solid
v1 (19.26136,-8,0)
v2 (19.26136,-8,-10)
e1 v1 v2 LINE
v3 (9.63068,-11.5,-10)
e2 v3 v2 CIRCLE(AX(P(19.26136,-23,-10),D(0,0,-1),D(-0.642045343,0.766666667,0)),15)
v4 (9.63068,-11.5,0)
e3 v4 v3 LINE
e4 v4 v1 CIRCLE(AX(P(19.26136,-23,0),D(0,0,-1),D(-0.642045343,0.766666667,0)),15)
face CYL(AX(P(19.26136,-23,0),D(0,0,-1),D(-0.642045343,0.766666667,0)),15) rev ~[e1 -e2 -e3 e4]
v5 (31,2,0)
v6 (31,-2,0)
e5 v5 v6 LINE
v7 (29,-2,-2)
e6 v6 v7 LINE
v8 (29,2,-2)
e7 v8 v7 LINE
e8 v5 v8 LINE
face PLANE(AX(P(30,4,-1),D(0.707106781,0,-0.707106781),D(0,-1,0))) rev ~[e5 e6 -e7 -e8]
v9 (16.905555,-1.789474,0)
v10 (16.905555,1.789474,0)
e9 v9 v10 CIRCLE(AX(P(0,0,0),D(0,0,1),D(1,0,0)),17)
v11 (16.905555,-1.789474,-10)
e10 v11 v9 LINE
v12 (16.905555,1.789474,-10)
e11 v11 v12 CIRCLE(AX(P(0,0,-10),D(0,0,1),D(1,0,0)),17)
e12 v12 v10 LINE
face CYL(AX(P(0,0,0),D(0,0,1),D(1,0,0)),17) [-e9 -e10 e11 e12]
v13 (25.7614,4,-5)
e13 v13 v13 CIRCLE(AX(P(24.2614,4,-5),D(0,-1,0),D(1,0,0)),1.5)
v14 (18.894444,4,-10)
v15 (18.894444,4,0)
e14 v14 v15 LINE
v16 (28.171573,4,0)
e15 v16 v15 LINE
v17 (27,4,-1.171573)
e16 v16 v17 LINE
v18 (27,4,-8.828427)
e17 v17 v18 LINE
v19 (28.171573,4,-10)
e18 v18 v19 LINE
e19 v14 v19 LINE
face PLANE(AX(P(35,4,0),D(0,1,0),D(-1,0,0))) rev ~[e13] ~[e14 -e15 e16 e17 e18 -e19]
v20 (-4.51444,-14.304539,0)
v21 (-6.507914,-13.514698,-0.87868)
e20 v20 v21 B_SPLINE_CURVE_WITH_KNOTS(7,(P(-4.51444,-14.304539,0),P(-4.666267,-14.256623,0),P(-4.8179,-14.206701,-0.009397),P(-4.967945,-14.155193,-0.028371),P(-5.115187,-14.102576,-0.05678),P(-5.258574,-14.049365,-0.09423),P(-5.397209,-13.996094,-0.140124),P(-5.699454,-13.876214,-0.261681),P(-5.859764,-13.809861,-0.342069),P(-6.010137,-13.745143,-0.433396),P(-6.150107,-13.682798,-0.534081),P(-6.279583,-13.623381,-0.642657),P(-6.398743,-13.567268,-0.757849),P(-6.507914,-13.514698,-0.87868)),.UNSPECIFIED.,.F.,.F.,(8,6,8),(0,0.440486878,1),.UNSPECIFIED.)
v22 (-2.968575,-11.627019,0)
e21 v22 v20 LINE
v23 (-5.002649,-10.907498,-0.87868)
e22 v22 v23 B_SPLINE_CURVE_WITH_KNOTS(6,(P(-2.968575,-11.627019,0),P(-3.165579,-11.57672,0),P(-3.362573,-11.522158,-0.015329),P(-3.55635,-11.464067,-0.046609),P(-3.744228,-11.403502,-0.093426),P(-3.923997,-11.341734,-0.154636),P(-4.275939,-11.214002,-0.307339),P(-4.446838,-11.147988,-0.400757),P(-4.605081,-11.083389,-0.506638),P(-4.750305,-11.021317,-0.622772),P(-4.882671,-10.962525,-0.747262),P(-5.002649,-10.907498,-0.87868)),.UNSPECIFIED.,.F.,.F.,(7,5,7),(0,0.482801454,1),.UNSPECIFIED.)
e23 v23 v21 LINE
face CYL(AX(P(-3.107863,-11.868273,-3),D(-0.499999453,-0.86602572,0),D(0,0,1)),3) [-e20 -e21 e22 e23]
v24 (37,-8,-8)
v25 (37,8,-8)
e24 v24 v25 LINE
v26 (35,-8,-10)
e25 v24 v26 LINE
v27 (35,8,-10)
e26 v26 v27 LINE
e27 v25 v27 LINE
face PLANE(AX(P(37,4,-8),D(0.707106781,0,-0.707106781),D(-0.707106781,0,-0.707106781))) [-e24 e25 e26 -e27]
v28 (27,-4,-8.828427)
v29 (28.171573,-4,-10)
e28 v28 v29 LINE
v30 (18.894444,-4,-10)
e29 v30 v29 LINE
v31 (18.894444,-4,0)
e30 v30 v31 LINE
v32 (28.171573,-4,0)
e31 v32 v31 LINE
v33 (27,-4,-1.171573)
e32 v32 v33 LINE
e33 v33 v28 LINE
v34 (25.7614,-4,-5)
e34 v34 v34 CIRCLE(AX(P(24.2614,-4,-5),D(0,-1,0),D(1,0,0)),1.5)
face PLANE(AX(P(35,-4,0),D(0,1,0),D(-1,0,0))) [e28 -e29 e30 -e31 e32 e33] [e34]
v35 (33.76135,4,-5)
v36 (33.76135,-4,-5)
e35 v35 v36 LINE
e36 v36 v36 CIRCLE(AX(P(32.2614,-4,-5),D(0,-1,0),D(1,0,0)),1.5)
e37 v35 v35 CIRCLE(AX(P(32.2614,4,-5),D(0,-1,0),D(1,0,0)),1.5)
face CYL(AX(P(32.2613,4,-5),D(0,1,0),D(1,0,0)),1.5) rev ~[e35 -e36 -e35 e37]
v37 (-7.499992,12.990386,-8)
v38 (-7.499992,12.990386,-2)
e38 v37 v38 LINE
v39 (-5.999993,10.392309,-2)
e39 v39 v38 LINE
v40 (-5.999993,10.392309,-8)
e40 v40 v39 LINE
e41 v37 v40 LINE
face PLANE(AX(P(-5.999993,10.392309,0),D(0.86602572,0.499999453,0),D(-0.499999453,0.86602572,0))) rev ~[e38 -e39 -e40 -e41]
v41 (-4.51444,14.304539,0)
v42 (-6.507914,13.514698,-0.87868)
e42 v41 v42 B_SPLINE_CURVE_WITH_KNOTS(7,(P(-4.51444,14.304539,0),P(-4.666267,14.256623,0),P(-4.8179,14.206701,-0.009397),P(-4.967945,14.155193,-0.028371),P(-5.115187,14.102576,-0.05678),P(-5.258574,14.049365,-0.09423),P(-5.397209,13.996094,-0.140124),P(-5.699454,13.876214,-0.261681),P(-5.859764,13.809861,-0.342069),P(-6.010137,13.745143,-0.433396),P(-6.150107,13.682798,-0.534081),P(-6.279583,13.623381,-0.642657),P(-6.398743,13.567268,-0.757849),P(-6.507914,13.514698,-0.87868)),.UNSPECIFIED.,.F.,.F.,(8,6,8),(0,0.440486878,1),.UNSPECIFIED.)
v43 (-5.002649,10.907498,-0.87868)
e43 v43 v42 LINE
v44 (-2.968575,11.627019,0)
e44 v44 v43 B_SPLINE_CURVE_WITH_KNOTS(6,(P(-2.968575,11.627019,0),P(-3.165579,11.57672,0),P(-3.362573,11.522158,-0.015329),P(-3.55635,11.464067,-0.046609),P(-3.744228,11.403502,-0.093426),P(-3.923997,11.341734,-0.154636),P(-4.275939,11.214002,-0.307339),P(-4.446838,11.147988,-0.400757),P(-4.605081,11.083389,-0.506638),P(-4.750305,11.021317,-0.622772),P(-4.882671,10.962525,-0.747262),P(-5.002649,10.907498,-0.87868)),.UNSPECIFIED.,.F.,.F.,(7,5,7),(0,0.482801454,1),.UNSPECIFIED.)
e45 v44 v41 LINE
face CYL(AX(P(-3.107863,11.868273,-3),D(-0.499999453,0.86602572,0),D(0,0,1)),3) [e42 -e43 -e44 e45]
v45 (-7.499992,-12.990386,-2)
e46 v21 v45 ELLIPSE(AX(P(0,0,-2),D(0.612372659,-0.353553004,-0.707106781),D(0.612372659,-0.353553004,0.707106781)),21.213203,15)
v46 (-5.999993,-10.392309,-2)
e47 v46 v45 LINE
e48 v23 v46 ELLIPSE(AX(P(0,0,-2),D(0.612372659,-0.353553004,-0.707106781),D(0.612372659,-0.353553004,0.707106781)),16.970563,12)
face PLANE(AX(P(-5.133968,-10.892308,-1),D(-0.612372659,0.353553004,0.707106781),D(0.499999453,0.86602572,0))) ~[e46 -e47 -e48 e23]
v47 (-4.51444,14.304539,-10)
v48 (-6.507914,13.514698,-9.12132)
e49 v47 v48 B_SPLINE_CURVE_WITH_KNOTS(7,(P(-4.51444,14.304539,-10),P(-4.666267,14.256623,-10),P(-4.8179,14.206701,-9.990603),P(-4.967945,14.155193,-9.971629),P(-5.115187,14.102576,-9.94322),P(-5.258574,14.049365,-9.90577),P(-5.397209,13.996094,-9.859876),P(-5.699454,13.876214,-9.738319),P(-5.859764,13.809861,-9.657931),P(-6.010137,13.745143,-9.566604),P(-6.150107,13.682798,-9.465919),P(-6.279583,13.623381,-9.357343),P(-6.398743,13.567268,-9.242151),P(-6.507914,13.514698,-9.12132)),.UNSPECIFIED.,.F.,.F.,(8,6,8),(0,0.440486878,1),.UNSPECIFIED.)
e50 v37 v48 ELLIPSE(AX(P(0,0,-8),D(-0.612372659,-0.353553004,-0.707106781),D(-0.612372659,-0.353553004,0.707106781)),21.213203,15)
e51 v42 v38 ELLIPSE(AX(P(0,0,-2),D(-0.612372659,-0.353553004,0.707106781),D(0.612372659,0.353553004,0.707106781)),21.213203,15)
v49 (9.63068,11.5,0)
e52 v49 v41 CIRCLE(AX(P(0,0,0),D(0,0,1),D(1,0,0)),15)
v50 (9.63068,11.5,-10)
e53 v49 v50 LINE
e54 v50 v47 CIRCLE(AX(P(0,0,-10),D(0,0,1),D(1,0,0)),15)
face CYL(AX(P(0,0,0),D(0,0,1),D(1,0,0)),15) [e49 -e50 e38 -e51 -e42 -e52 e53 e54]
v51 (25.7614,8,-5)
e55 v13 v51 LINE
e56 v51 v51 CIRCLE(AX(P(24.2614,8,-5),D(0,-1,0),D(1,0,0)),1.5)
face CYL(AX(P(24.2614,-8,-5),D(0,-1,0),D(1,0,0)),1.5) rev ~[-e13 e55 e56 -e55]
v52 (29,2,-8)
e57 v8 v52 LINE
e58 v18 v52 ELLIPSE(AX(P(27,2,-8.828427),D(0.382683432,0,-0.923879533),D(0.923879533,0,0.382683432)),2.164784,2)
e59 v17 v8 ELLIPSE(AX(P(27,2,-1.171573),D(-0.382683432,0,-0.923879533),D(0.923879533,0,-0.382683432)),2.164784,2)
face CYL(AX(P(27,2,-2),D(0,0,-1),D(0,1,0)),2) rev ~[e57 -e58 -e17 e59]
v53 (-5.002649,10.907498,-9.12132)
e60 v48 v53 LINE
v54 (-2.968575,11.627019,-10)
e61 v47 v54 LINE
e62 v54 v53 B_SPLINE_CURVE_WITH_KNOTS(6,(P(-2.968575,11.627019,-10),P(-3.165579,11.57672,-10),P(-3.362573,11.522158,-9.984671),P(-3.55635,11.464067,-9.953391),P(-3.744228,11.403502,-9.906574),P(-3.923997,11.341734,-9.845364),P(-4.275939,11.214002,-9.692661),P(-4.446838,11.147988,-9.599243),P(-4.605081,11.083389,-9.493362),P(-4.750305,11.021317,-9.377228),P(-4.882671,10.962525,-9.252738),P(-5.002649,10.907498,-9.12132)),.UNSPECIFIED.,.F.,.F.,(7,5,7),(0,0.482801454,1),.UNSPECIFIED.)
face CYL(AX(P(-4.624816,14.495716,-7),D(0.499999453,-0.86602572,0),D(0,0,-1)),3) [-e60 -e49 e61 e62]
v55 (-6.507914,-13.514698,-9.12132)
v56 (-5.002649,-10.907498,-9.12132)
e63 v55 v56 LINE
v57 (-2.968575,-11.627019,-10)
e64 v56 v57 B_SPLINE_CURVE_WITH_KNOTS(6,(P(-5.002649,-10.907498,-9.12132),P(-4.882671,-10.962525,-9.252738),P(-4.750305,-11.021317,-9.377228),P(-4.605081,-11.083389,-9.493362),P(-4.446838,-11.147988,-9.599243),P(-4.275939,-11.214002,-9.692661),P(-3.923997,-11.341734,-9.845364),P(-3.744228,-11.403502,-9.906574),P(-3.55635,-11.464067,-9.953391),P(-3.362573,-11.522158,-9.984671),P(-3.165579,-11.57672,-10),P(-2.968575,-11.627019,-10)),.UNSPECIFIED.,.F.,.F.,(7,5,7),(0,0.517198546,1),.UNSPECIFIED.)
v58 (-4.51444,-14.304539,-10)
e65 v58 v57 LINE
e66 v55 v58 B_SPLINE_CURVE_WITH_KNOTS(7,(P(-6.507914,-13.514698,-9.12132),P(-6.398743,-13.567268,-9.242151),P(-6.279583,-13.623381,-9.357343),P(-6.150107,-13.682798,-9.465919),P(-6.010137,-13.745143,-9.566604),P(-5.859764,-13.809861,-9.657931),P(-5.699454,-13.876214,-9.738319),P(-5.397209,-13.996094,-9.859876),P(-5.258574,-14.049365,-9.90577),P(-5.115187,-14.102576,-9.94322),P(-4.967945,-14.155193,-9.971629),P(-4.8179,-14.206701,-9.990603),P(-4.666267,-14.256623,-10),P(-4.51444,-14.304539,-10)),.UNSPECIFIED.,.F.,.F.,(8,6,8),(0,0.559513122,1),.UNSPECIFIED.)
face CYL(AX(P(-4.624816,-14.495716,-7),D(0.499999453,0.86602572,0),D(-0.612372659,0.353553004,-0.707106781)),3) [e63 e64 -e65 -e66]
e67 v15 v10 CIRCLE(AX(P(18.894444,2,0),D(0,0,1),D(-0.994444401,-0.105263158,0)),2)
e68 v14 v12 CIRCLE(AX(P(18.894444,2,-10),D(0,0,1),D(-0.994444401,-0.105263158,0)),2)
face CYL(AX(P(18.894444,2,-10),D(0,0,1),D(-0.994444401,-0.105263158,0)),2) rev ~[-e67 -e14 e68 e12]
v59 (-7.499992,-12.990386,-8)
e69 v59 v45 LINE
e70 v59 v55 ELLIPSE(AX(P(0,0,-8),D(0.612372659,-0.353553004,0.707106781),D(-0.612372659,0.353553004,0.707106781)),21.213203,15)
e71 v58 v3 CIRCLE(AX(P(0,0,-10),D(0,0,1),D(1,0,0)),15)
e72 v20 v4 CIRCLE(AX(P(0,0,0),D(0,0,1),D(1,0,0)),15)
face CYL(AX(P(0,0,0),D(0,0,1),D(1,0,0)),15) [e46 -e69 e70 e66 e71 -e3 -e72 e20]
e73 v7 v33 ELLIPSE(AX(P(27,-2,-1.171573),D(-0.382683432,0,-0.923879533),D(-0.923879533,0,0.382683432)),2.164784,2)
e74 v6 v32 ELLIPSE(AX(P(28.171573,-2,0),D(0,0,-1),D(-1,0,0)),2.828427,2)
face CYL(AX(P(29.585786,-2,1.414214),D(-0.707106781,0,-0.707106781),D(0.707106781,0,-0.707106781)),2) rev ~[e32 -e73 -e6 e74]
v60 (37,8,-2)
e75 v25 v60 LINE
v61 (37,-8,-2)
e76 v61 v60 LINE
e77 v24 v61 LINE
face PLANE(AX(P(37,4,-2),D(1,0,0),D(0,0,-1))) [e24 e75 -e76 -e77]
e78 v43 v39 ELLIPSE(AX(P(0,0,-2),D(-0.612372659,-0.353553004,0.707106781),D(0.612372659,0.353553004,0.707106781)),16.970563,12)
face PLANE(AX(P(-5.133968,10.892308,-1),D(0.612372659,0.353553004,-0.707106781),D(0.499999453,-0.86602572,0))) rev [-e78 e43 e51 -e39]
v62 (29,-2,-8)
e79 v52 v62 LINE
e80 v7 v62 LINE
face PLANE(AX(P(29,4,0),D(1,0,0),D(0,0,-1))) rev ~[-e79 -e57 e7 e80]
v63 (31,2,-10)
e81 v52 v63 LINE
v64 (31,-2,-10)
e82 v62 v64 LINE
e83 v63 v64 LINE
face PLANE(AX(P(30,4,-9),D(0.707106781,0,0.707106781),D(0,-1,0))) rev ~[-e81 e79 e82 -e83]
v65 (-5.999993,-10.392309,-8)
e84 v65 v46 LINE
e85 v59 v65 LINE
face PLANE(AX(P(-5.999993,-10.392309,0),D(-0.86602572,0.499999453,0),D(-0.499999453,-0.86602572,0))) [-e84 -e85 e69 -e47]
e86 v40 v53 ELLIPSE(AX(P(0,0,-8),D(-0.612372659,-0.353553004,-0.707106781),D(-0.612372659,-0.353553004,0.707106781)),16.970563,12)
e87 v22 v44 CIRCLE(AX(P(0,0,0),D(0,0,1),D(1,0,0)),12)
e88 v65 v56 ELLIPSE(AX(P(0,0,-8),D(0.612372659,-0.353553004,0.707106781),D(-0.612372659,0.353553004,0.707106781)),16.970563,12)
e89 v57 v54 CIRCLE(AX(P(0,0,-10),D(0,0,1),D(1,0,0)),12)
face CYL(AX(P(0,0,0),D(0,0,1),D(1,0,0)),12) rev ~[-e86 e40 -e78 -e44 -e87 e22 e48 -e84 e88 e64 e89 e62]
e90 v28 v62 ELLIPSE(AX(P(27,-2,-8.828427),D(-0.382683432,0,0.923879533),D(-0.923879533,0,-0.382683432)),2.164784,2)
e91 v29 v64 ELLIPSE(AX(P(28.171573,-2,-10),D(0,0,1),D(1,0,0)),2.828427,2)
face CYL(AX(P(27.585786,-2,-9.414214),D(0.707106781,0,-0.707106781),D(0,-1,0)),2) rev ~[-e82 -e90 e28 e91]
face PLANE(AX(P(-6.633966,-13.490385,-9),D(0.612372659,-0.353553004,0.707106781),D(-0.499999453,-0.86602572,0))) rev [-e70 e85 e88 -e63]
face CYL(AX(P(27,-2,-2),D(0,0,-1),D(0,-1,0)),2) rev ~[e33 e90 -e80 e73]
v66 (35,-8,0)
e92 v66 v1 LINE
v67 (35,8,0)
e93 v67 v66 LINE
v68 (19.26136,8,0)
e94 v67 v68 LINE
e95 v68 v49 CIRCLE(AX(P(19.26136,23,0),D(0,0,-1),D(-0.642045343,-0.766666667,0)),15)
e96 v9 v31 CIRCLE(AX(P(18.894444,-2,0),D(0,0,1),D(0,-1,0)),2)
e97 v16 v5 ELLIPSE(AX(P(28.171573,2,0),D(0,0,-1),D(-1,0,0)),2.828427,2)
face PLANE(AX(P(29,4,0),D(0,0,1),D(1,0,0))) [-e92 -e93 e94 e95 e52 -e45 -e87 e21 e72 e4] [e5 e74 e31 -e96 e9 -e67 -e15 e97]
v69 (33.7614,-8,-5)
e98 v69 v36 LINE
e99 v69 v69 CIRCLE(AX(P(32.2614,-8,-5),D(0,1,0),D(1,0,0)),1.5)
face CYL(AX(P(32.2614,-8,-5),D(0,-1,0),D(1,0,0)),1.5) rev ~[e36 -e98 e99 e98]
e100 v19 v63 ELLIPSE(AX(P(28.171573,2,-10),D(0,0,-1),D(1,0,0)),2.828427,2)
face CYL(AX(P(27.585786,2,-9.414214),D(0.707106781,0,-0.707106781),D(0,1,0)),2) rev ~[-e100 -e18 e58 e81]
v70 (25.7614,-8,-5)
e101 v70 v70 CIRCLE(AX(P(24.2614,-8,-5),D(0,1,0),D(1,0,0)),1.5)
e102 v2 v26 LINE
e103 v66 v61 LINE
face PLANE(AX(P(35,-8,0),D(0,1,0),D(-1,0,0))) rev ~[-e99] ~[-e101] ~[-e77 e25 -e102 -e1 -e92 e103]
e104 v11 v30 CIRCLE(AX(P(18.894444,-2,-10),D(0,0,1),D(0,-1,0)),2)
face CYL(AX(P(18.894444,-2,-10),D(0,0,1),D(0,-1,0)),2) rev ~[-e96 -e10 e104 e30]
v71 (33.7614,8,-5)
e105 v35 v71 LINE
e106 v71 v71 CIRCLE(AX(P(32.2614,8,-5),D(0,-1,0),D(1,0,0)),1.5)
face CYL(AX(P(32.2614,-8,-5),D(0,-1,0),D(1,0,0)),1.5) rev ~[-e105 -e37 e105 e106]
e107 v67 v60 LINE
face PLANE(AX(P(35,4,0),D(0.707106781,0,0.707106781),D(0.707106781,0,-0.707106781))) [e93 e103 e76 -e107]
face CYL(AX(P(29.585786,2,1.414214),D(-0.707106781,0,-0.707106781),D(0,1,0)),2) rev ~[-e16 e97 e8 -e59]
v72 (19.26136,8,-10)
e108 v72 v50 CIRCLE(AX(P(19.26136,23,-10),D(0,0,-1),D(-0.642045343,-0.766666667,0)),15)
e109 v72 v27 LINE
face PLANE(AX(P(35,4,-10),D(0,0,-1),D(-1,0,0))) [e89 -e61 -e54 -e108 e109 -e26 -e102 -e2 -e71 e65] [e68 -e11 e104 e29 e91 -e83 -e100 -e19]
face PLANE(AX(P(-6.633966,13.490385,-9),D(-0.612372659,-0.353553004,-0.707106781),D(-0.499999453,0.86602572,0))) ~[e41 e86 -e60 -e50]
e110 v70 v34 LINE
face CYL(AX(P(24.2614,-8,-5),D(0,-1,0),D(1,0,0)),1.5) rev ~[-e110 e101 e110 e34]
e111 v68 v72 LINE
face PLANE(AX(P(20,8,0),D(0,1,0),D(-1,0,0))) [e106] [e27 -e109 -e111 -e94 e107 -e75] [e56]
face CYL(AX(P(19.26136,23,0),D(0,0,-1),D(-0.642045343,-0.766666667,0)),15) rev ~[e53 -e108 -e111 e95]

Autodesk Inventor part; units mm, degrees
ref_plane "YZ Plane" through (0, 0, 0) normal (1, 0, 0) x (0, 1, 0)
ref_plane "XZ Plane" through (0, 0, 0) normal (0, 1, 0) x (-1, 0, 0)
ref_plane "XY Plane" through (0, 0, 0) normal (0, 0, 1) x (1, 0, 0)
ref_plane "Work Plane1" through (0, 0, 0) normal (0, 0, 1) x (1, 0, 0)
sketch "Sketch1" plane through (0, 0, 0) normal (0, 0, 1) x (1, 0, 0)
  circle A0 centre (0, 0) radius 12 projected
  circle A1 centre (0, 0) radius 12
  circle A2 centre (0, 0) radius 15
  line L0 (0, 0) -> (0, 15)
  line L1 (0, 0) -> (-7.5, 12.9904)
  line L2 (0, 0) -> (0, -15)
  line L3 (0, 0) -> (-7.5, -12.9904)
  point P0 (-6, 10.3923)
  point P1 (-6, -10.3923)
  dimension "d0" = 24
  dimension "d1" = 30
  dimension "d2" = 30
  dimension "d3" = 30
extrude "Extrusion1" add sketch "Sketch1" against normal blind 10 contours A0 L0 A2 L2 | A0 L1 A2 L0 | L2 A2 L3 A0
sketch "Sketch2" plane through (0, 0, 0) normal (0, 0, 1) x (1, 0, 0)
  line L0 (60, -8) -> (20, -8) projected
  line L1 (20, -8) -> (35, -8)
  arc A0 (-7.5, -12.9904) -> (-7.5, 12.9904) centre (0, 0) ccw projected
  line L2 (20, -8) -> (12.6886, -8)
  line L3 (35, -8) -> (35, 8)
  line L4 (35, 8) -> (20, 8)
  line L5 (20, 8) -> (12.6886, 8)
  line L6 (35, -8) -> (35, -4)
  line L7 (35, -4) -> (14.4568, -4)
  line L8 (35, 8) -> (35, 4)
  line L9 (35, 4) -> (14.4568, 4)
  dimension "d6" = 15
  dimension "d7" = 16
  dimension "d8" = 15
  dimension "d9" = 4
  dimension "d10" = 4
extrude "Extrusion2" add sketch "Sketch2" against normal up to surface (10 mm away) contours L0 L2 A0 L7 L3 | L9 A0 L5 L4 L3
fillet "Fillet1" radius 15 2 edges at (12.6886, 8, -5) (12.6886, -8, -5)
thicken "Thicken1" operation add thickness 2 both sides no extend neighbours yes toward (0.9780418, 0.2084088, 0) faces at (14.6706, 3.1261, -6.6667)
fillet "Fillet2" radius 2 2 edges at (16.5227, 4, -5) (16.5227, -4, -5)
thicken "Thicken2" operation add thickness 2 both sides no extend neighbours yes toward (1, 0, 0) faces at (35, -6.6667, -3.3333)
thicken "Thicken3" operation add thickness 2 both sides no extend neighbours yes toward (1, 0, 0) faces at (35, 6.6667, -6.6667)
sketch "Sketch4" plane through (19.2614, -8, -10) normal (0, -1, 0) x (1, 0, 0)
  line L0 (0, 0) -> (0, 10) projected
  line L1 (17.7386, 0) -> (0, 0) projected
  line L2 (17.7386, 10) -> (17.7386, 0) projected
  line L3 (0, 10) -> (17.7386, 10) projected
  line L4 (0, 10) -> (0, 0) projected
  line L5 (0, 5) -> (5, 5)
  line L6 (5, 5) -> (13, 5)
  circle A0 centre (5, 5) radius 1.5
  circle A1 centre (13, 5) radius 1.5
  point P0 (-19.2614, 10)
  dimension "d30" = 5
  dimension "d31" = 8
  dimension "d32" = 3
  dimension "d33" = 3
extrude "Extrusion4" cut sketch "Sketch4" against normal up to surface (16 mm away) contours A0 L6 L5 | L5 L6 A0 | A1
chamfer "Chamfer1" distance 2 angle 45 4 edges at (37, -6, -10) (37, 6, 0) (37, -6, 0) (37, 6, -10)
chamfer "Chamfer2" distance 2 angle 45 4 edges at (-6.75, -11.6913, -10) (-6.75, -11.6913, 0) (-6.75, 11.6913, 0) (-6.75, 11.6913, -10)
fillet "Fillet4" radius 3 4 edges at (-4.9425, -12.5607, -10) (-4.9425, 12.5607, -10) (-4.9425, -12.5607, 0) (-4.9425, 12.5607, 0)
sketch "Sketch5" plane through (18.8944, 4, -10) normal (0, -1, 0) x (1, 0, 0)
  line L0 (16.1056, 10) -> (18.1056, 8) projected
  line L1 (0.3669, 10) -> (16.1056, 10) projected
  line L2 (0.3669, 0) -> (0.3669, 10) projected
  line L3 (16.1056, 0) -> (0.3669, 0) projected
  line L4 (18.1056, 2) -> (16.1056, 0) projected
  line L5 (18.1056, 8) -> (18.1056, 2) projected
  circle A0 centre (5.3669, 5) radius 1.5 projected
  circle A1 centre (13.3669, 5) radius 1.5 projected
  line L6 (0.3669, 10) -> (16.1056, 10) projected
  line L7 (16.1056, 10) -> (10.1056, 10)
  line L8 (10.1056, 10) -> (10.1056, 0)
  point P0 (-18.8944, 10)
  point P1 (10.1056, 10)
  point P2 (10.1056, 0)
  dimension "d43" = 6
extrude "Extrusion5" add sketch "Sketch5" along normal up to surface (8 mm away) contours L0 L5 L4 L3 L8 L1
chamfer "Chamfer3" distance 2 angle 45 2 edges at (29, 0, -10) (29, 0, 0)
fillet "Fillet5" radius 2 6 edges at (30, -4, -1) (29, -4, -5) (30, -4, -9) (30, 4, -9) (29, 4, -5) (30, 4, -1)
properties part number "motor_holder_1"
